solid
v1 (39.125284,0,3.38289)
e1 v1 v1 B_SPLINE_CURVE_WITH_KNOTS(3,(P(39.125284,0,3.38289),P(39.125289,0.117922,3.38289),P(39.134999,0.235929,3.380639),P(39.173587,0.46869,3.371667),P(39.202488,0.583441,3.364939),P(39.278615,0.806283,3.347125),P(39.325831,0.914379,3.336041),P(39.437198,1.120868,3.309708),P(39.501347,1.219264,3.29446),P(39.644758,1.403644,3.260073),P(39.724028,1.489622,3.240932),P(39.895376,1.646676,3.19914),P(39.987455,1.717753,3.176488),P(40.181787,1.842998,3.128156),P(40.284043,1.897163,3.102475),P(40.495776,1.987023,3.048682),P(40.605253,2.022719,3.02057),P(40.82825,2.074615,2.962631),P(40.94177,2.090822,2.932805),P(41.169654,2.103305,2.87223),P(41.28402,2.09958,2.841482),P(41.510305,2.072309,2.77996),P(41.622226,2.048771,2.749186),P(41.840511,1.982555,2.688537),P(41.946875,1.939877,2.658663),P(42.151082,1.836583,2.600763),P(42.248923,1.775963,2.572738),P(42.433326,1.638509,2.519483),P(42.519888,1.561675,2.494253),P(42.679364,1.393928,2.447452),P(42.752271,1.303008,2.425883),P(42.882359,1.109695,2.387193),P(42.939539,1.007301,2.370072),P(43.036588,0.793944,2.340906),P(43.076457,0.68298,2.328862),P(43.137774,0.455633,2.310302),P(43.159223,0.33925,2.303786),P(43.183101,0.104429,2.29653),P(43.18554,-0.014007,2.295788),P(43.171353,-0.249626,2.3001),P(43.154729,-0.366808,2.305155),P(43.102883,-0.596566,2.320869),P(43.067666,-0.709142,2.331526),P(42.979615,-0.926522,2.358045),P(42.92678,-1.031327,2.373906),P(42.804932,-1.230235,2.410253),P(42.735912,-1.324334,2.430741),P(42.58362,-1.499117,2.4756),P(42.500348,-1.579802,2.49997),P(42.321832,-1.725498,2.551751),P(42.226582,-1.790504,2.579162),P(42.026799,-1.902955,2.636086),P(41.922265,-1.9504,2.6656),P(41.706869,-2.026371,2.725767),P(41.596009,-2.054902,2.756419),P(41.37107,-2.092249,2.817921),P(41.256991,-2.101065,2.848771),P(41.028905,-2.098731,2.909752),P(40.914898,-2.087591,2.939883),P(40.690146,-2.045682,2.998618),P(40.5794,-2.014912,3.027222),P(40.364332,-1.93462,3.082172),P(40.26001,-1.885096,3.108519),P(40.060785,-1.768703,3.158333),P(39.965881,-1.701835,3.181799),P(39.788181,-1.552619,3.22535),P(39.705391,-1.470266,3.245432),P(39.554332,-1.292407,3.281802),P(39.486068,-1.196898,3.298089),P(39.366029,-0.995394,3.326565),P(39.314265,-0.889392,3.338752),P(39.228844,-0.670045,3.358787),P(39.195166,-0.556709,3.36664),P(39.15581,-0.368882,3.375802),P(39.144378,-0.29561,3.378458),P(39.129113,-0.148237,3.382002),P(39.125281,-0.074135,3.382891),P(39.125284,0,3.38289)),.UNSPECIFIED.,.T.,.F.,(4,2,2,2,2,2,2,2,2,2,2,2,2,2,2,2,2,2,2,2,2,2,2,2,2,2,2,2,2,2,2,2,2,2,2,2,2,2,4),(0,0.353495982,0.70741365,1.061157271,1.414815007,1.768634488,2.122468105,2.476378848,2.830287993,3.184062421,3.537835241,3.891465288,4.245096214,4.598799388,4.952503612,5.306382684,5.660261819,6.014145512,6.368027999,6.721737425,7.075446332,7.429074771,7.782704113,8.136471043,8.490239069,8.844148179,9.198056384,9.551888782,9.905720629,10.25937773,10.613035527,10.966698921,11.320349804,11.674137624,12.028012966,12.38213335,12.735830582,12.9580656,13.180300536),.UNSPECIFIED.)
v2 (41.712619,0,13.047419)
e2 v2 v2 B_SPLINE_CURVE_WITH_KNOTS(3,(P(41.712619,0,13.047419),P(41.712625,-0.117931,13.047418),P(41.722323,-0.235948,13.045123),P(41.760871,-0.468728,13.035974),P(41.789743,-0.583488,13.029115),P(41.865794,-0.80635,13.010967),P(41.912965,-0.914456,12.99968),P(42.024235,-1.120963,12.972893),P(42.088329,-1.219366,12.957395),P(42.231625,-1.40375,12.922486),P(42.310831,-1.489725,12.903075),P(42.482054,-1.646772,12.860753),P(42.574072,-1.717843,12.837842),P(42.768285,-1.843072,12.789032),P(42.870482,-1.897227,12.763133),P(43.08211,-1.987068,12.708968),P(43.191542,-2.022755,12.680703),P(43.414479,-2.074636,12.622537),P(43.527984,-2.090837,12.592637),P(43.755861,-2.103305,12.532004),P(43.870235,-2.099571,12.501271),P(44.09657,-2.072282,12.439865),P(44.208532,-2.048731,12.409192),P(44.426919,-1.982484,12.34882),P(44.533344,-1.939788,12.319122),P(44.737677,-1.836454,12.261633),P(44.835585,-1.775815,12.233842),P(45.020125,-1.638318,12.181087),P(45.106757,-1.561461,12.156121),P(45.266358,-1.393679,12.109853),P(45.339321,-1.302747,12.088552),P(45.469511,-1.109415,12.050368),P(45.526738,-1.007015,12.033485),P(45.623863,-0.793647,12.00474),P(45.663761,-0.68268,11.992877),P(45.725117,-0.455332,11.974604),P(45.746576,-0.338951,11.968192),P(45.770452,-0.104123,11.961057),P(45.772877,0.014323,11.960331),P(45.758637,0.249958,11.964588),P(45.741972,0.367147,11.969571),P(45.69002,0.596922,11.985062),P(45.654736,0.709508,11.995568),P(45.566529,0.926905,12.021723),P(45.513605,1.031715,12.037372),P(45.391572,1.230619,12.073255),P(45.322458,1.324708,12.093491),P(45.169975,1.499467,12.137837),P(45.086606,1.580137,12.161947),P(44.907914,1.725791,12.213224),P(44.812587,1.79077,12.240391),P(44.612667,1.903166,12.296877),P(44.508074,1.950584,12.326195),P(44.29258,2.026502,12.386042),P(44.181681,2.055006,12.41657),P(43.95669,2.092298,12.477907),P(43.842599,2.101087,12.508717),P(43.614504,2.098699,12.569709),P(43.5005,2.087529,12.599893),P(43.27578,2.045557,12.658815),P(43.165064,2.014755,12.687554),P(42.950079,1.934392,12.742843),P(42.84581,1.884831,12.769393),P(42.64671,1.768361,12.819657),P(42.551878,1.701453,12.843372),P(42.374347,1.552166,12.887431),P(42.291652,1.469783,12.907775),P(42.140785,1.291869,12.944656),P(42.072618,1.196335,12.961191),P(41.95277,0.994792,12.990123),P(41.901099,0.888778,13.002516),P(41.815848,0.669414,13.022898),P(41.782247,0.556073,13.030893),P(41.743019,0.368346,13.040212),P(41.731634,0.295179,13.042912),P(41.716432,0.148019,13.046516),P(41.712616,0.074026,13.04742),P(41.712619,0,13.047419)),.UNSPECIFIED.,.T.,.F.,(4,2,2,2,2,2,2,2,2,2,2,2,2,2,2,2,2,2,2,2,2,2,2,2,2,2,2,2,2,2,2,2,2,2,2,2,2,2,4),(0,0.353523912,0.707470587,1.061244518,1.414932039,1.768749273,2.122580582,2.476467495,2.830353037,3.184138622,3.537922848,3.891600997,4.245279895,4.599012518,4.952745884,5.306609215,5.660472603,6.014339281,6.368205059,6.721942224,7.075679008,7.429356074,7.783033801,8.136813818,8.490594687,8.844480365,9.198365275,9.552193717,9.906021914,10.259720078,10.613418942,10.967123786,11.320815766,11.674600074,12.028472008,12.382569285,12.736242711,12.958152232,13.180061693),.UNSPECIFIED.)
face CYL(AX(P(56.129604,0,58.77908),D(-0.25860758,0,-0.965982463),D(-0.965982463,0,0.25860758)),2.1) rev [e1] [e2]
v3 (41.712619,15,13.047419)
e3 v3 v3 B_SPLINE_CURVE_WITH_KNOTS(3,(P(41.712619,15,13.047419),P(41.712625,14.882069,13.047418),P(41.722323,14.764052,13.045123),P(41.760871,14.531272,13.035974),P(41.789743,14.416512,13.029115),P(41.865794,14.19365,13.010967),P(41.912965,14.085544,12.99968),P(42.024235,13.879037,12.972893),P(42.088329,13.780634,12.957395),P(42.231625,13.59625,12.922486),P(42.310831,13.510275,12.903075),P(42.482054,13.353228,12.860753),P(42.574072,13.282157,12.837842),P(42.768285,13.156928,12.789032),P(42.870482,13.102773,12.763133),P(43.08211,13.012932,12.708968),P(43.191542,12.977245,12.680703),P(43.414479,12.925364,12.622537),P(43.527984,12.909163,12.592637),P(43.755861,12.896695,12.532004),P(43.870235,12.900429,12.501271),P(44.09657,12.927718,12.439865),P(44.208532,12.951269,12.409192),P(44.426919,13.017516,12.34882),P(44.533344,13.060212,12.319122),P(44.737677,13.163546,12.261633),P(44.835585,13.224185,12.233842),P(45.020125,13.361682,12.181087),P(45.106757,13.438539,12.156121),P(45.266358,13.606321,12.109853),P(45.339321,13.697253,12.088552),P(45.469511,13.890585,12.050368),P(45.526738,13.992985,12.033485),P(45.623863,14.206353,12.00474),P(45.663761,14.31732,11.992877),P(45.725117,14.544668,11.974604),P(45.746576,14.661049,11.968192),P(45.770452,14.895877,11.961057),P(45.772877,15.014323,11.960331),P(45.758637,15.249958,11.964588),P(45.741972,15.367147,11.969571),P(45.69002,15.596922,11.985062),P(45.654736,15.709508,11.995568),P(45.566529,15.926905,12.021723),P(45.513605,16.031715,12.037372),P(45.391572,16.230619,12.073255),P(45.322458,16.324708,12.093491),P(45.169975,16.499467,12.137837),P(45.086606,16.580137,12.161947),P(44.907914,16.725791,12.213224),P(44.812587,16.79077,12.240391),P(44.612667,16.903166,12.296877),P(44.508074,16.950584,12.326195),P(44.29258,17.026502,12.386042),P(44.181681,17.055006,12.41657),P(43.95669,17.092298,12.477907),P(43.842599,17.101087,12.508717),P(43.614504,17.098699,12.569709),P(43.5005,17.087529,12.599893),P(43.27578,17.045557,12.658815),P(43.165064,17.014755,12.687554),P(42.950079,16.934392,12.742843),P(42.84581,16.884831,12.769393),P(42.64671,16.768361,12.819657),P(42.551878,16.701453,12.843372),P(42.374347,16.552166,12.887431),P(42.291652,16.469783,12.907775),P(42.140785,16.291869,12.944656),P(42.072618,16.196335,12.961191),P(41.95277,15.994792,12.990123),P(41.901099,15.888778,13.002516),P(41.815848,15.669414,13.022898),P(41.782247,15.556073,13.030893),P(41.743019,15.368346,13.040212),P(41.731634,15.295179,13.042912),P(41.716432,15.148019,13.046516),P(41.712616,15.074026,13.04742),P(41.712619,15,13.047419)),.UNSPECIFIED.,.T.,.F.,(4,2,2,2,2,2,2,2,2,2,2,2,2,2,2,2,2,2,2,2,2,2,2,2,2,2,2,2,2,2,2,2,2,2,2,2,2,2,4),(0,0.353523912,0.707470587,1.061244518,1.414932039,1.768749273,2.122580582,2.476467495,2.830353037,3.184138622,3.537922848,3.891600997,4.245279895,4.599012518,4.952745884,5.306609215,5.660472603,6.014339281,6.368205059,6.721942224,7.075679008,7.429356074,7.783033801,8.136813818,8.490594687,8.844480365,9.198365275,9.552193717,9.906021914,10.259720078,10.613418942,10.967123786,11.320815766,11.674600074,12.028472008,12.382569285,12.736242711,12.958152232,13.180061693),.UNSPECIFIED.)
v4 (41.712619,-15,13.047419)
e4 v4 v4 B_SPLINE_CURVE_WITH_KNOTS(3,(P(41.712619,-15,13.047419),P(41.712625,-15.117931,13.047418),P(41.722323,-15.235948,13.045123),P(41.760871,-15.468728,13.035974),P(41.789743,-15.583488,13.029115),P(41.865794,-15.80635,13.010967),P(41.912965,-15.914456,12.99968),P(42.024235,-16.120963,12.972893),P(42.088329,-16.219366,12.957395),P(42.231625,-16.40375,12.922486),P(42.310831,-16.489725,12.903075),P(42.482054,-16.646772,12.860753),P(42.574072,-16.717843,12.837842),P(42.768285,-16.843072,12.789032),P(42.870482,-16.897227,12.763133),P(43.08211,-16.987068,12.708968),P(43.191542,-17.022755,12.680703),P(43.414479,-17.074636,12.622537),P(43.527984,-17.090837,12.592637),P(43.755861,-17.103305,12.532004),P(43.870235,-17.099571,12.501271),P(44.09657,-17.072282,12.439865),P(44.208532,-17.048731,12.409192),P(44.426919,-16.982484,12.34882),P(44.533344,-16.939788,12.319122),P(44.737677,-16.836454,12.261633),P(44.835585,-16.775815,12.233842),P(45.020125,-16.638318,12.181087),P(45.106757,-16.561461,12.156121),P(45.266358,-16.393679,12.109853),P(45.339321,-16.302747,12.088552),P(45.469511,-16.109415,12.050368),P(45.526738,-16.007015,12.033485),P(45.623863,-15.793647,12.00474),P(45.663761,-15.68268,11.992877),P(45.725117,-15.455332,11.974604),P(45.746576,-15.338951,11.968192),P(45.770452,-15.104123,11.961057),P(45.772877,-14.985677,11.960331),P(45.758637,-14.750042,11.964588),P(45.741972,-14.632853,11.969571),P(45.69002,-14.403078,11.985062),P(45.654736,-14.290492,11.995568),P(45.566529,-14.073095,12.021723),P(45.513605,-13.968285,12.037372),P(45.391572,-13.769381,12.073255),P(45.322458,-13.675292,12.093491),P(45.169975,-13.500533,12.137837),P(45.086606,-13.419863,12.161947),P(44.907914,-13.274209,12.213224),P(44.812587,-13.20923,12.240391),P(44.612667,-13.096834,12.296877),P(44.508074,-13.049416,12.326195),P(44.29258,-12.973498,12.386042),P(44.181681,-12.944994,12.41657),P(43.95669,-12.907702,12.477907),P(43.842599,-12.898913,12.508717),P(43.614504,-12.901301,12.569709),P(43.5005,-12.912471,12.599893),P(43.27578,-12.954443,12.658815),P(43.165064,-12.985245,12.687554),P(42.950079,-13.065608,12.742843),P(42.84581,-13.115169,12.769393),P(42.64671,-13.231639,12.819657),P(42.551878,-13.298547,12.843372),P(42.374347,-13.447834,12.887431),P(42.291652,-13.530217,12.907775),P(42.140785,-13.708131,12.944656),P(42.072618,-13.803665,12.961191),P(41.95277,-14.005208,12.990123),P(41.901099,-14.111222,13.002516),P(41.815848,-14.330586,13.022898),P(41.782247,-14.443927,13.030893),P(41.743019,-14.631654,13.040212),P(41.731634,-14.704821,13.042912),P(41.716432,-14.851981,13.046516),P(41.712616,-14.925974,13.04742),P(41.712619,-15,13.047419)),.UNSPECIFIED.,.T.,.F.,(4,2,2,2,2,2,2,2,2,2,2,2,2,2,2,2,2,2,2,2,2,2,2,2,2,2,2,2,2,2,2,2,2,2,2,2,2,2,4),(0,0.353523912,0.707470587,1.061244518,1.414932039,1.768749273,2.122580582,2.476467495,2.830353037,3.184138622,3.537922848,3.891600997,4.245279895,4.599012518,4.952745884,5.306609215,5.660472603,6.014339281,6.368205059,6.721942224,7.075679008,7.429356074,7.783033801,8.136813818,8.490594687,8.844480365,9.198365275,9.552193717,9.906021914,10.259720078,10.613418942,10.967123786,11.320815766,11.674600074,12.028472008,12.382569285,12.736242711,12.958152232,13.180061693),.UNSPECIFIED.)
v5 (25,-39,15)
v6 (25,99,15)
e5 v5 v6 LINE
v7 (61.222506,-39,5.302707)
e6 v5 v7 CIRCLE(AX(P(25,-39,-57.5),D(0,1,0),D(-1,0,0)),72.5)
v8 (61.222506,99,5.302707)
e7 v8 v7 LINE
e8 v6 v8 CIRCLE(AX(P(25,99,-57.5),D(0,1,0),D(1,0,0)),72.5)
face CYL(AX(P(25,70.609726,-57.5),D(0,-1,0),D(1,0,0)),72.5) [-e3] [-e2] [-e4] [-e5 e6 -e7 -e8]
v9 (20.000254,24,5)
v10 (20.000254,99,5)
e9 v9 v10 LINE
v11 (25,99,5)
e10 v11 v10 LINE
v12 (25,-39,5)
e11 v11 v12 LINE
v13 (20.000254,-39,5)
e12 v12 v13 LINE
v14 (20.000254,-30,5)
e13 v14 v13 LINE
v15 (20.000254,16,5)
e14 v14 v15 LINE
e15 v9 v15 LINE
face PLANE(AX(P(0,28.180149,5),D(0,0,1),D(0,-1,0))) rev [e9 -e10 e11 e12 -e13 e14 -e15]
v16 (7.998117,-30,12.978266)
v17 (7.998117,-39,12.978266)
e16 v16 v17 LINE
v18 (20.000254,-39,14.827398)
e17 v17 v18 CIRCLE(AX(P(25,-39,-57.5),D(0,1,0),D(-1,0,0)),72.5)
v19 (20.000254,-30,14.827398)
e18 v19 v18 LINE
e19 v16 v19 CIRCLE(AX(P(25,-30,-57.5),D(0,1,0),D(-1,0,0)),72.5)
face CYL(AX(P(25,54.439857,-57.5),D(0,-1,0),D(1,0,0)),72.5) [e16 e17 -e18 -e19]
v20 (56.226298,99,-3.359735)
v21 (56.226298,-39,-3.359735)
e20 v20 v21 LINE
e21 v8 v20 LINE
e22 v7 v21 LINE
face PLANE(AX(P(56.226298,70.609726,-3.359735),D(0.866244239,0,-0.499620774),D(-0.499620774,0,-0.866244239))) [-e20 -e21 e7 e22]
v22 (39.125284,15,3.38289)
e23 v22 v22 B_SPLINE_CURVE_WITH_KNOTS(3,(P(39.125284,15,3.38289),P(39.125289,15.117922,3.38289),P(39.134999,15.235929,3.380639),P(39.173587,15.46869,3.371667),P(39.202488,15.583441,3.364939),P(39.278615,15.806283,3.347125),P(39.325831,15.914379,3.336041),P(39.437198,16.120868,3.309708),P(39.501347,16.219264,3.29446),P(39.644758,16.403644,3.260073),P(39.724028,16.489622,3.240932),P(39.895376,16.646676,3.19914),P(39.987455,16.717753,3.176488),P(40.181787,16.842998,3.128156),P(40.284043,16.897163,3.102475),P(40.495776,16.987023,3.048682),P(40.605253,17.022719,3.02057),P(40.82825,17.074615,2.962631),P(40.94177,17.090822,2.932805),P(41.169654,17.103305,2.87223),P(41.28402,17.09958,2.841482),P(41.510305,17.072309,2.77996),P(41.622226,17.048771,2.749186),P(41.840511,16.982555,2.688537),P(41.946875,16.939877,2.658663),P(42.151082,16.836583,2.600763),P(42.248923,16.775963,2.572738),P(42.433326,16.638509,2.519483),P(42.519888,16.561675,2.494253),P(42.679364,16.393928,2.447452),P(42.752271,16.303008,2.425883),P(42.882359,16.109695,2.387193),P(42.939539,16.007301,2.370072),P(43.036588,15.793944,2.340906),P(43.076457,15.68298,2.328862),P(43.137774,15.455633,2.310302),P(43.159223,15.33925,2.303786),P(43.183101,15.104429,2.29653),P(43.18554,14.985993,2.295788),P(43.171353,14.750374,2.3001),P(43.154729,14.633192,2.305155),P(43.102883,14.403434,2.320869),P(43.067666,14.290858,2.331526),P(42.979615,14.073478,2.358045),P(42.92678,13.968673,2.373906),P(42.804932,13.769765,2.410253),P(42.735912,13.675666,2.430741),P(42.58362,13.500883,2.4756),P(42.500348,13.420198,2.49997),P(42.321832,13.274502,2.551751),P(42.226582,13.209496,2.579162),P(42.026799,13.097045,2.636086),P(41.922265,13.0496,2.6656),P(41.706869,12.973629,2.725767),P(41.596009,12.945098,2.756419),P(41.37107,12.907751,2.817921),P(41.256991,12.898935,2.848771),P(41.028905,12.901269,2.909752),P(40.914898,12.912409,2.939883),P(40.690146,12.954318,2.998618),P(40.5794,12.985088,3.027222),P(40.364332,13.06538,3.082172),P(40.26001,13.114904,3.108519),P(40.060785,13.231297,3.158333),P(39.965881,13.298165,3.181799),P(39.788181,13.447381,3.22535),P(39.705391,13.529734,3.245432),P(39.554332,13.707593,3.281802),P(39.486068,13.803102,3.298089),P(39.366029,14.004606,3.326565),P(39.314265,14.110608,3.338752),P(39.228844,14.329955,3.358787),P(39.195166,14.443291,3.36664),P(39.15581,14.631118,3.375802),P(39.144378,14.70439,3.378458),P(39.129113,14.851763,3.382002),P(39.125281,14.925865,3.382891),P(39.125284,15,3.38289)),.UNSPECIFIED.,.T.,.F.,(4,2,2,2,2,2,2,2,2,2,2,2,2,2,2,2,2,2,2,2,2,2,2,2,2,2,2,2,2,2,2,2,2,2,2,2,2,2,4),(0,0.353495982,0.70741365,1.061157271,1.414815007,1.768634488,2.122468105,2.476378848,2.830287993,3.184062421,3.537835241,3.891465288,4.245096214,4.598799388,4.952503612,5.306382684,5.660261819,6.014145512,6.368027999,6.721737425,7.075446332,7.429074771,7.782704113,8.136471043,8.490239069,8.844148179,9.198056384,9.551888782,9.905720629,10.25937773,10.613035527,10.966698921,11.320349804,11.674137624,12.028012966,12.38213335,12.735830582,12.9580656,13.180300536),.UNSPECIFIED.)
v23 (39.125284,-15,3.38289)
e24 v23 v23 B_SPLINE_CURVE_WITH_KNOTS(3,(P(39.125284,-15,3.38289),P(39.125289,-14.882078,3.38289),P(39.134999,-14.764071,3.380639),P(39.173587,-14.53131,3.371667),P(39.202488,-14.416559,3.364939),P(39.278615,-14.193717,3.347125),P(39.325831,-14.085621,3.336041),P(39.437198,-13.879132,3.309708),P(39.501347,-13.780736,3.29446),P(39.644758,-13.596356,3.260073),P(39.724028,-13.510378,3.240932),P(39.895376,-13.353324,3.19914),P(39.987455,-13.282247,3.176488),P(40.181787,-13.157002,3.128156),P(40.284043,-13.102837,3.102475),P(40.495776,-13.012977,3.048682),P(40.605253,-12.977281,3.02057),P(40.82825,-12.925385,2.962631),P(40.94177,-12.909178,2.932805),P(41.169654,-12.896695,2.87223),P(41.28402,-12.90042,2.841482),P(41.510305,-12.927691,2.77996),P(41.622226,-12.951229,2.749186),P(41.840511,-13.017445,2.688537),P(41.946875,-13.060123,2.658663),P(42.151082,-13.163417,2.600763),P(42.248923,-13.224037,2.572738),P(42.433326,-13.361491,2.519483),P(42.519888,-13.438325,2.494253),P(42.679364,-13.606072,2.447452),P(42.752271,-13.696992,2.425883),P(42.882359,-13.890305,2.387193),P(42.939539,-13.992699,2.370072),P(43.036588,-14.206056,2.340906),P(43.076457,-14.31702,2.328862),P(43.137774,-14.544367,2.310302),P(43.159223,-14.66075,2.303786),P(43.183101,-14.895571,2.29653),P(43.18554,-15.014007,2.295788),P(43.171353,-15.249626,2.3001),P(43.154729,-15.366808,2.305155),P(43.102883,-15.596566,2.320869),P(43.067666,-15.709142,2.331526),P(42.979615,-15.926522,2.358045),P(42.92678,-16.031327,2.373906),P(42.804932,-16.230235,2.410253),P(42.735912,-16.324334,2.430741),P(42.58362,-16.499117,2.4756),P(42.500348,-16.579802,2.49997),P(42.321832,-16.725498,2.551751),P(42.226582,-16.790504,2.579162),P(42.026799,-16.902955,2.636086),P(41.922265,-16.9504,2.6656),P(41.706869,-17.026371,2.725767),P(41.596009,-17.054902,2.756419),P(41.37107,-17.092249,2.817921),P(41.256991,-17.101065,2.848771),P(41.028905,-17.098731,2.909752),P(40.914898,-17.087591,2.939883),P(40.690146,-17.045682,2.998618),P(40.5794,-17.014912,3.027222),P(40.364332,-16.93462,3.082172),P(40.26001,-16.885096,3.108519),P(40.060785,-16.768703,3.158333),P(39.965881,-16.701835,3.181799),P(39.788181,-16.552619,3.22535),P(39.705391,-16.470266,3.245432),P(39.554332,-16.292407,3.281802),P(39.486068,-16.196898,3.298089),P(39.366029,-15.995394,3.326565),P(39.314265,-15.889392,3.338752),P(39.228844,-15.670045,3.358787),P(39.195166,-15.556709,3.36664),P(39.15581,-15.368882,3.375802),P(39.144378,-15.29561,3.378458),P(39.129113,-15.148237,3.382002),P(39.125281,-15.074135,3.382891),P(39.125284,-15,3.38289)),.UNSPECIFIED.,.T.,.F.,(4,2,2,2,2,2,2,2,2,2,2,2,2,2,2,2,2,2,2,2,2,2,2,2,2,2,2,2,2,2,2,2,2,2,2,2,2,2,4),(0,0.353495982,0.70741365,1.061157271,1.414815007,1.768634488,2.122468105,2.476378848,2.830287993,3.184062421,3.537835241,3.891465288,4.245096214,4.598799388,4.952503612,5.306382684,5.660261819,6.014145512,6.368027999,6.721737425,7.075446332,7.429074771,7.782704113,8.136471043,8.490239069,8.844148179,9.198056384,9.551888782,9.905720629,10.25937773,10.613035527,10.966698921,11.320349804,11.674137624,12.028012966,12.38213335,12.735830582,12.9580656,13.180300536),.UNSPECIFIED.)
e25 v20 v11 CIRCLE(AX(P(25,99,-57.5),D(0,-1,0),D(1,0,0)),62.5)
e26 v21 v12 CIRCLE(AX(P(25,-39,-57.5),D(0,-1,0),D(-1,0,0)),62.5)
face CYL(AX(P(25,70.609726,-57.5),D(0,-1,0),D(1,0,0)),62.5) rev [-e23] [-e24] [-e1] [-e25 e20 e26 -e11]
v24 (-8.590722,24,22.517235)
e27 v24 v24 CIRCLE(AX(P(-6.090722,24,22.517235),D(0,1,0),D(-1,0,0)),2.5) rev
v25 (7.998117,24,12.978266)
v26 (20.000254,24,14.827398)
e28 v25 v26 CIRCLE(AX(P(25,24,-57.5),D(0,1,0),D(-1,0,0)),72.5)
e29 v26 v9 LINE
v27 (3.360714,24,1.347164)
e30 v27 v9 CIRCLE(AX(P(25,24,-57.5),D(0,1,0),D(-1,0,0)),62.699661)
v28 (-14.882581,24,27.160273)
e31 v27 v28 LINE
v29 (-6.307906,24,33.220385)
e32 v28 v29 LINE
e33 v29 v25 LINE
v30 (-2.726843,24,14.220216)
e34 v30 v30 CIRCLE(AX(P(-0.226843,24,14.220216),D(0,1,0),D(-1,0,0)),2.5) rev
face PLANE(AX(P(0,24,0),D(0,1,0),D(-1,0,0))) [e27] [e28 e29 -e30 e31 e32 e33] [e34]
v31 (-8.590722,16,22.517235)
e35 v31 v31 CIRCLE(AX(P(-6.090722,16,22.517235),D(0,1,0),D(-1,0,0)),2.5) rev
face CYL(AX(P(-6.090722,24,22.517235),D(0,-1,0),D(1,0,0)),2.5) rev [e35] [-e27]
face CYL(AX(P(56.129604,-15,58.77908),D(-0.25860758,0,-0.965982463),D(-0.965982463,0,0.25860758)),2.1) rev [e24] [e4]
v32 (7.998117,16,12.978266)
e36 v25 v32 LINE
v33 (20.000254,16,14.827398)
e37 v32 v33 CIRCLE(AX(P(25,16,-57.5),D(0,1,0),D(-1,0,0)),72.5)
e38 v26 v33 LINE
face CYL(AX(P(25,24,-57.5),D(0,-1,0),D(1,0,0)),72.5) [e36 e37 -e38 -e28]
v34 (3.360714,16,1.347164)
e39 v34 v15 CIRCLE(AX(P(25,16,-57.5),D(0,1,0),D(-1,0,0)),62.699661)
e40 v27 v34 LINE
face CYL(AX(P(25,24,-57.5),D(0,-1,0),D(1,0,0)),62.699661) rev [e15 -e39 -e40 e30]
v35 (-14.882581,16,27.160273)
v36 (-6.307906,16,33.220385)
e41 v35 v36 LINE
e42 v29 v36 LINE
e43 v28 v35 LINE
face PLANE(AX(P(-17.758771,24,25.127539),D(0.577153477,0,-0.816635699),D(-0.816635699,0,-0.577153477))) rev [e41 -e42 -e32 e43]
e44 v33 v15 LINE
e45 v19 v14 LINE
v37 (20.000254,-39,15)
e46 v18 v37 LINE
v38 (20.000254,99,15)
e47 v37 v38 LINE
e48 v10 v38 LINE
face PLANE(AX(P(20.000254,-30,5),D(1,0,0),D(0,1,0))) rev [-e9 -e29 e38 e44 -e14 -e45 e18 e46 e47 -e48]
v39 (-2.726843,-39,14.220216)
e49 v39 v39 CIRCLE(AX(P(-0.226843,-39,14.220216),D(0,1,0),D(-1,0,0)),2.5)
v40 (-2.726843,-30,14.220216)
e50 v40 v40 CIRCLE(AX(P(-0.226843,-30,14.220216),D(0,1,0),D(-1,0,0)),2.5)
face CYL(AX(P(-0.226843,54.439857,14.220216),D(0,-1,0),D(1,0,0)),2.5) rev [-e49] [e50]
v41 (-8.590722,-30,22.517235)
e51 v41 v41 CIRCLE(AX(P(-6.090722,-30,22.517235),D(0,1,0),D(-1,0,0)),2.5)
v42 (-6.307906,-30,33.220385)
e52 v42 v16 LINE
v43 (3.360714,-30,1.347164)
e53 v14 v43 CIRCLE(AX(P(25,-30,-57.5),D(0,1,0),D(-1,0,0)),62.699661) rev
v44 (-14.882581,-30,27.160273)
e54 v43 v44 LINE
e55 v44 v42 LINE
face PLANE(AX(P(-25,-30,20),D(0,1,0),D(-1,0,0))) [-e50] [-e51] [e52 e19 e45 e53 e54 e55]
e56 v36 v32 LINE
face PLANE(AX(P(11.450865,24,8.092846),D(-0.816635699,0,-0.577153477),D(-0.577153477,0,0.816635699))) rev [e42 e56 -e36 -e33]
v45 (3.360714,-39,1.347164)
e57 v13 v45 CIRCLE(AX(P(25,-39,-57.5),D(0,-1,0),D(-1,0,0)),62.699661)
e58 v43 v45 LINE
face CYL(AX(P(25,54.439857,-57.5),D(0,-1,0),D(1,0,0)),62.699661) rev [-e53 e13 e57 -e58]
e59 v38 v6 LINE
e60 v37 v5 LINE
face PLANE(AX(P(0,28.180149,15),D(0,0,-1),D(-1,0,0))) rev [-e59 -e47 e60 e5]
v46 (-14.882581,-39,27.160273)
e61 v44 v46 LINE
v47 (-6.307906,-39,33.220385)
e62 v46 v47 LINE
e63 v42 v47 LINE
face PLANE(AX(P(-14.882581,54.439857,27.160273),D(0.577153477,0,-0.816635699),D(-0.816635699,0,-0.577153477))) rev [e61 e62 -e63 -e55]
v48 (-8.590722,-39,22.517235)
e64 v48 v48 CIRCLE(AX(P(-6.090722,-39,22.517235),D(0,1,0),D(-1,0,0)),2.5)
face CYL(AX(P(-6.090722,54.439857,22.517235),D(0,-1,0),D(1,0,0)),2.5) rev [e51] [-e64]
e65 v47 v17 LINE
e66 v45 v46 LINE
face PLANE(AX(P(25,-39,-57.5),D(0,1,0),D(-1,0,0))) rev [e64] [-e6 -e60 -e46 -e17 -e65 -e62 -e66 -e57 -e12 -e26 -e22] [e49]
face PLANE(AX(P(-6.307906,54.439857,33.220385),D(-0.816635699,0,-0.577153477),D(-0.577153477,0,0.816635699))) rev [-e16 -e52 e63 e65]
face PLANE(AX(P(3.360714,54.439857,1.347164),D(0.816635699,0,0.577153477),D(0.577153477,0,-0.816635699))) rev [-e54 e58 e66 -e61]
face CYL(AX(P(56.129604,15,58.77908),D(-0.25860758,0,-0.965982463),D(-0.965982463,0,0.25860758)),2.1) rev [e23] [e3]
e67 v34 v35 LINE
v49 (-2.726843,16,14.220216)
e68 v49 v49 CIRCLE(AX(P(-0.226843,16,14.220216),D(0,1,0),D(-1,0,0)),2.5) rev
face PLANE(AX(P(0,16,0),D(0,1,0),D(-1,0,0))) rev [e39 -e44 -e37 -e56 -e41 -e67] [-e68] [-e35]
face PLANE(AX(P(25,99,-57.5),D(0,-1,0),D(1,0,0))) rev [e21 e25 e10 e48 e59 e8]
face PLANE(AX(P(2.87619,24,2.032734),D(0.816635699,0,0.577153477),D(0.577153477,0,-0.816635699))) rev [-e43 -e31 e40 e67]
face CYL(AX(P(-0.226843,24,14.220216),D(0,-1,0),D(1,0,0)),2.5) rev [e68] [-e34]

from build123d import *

# Parameters (mm, degrees)
BOSS_EXTRUDE2_DEPTH = 20
FILLET1_RADIUS      = 10
FILLET1_LENGTH      = 5
FILLET2_RADIUS      = 10
FILLET2_LENGTH      = 5
SKETCH5_R           = 1
SKETCH5_R_2         = 5.5
CUT_EXTRUDE5_DEPTH  = 69.007352544
CUT_EXTRUDE7_DEPTH  = 25
FILLET5_R           = 10
BOSS_EXTRUDE5_DEPTH = 60
SKETCH13_R          = 2.1
CUT_EXTRUDE8_DEPTH  = 60
CUT_EXTRUDE9_DEPTH  = 60
CUT_EXTRUDE10_DEPTH = 60
SKETCH17_R          = 2.5
BOSS_EXTRUDE6_DEPTH = 8
SKETCH18_R          = 2.5
BOSS_EXTRUDE7_DEPTH = 9
BOSS_EXTRUDE8_DEPTH = 69


with BuildPart() as part:
    # Sketch1 → Boss-Extrude2 (new body)
    with BuildSketch(Plane.XY):
        Polygon((-25, 30), (25, 30), (25, -30), (-25, -30), (-25, -25), (-20, -25), (20, -25), (20, 25), (-20, 25), (-25, 25), align=None)
    extrude(amount=BOSS_EXTRUDE2_DEPTH)

    # Fillet1: full round fillet: the end face becomes a half cylinder, R = half its width
    fillet1_face = Plane((-25, 27.5, 10), x_dir=(0, -1, 0), z_dir=(-1, 0, 0))  # on the end face: x along it, z out of the body
    fillet1_slab = fillet1_face.offset(-FILLET1_RADIUS / 2) * Box(FILLET1_LENGTH, 2 * FILLET1_RADIUS, FILLET1_RADIUS, mode=Mode.PRIVATE)  # the body's end, R deep
    fillet1_round = Plane((-15, 27.5, 10), x_dir=(-1, 0, 0), z_dir=(0, -1, 0)) * Cylinder(FILLET1_RADIUS, FILLET1_LENGTH, mode=Mode.PRIVATE)  # its axis R under the face
    add(fillet1_slab - fillet1_round, mode=Mode.SUBTRACT)

    # Fillet2: full round fillet: the end face becomes a half cylinder, R = half its width
    fillet2_face = Plane((-25, -27.5, 10), x_dir=(0, -1, 0), z_dir=(-1, 0, 0))  # on the end face: x along it, z out of the body
    fillet2_slab = fillet2_face.offset(-FILLET2_RADIUS / 2) * Box(FILLET2_LENGTH, 2 * FILLET2_RADIUS, FILLET2_RADIUS, mode=Mode.PRIVATE)  # the body's end, R deep
    fillet2_round = Plane((-15, -27.5, 10), x_dir=(-1, 0, 0), z_dir=(0, -1, 0)) * Cylinder(FILLET2_RADIUS, FILLET2_LENGTH, mode=Mode.PRIVATE)  # its axis R under the face
    add(fillet2_slab - fillet2_round, mode=Mode.SUBTRACT)

    # Sketch5 → Cut-Extrude5 (cut, through all)
    with BuildSketch(Plane(origin=(0, 30, 0), x_dir=(1, 0, 0), z_dir=(0, 1, 0))):
        with Locations(Location((-15, -3, 0), (0, 0, 180))):
            Circle(SKETCH5_R)
        with Locations(Location((-22, -10, 0), (0, 0, 180))):
            Circle(SKETCH5_R)
        with Locations(Location((-15, -17, 0), (0, 0, 180))):
            Circle(SKETCH5_R)
        with Locations(Location((-8, -10, 0), (0, 0, 180))):
            Circle(SKETCH5_R)
        with Locations(Location((-15, -10, 0), (0, 0, 180))):
            Circle(SKETCH5_R_2)
    extrude(amount=-CUT_EXTRUDE5_DEPTH, mode=Mode.SUBTRACT)

    # Sketch10 → Cut-Extrude7 (cut)
    with BuildSketch(Plane(origin=(25, 0, 0), x_dir=(0, 0, -1), z_dir=(1, 0, 0))):
        Polygon((-15, 28.180148829), (-15, -28.180148829), (-15, -30), (-20, -30), (-20, 30), (-15, 30), align=None)
        Polygon((-5, 28.180148829), (-5, -28.180148829), (-5, -30), (0, -30), (0, 30), (-5, 30), align=None)
    extrude(amount=-CUT_EXTRUDE7_DEPTH, mode=Mode.SUBTRACT)

    # Fillet5
    # the kernel refuses this fillet: 10 mm, written as the material it adds along each edge
    with BuildSketch(Plane(origin=(0, 25, 15), x_dir=(1, 0, 0), z_dir=(0, 1, 0)), Plane(origin=(0, -30, 15), x_dir=(1, 0, 0), z_dir=(0, 1, 0)), Plane(origin=(0, -25, 5), x_dir=(1, 0, 0), z_dir=(0, -1, 0))) as fillet5_piece_1:
        with BuildLine():
            CenterArc((8.660254038, -10), FILLET5_R, 90, 60)
            Line((0, -5), (-0.173205081, -4.9))
            ThreePointArc((-0.173205081, -4.9), (-0.2, -2.5), (-0.2, 0))
            Line((-0.2, 0), (0, 0.2))
            Line((0, 0.2), (8.660254038, 0.2))
            Line((8.660254038, 0.2), (8.660254038, 0))
        make_face()
    extrude(amount=5)
    with BuildSketch(Plane(origin=(0, 30, 5), x_dir=(0, 0, -1), z_dir=(0, -1, 0))) as fillet5_piece_2:
        with BuildLine():
            CenterArc((10, 8.660254038), FILLET5_R, 180, 60)
            Line((0, 8.660254038), (-0.2, 8.660254038))
            Line((-0.2, 8.660254038), (-0.2, 0))
            Line((-0.2, 0), (0, -0.2))
            ThreePointArc((0, -0.2), (2.5, -0.2), (4.9, -0.173205081))
            Line((4.9, -0.173205081), (5, 0))
        make_face()
    extrude(amount=5)

    # Sketch12 → Boss-Extrude5 (add)
    with BuildSketch(Plane.XZ.offset(30)):
        with BuildLine():
            Line((56.226298398, -3.359735054), (61.222506141, 5.302707337))
            ThreePointArc((61.222506141, 5.302707337), (43.74904955, 12.533728595), (25, 15))
            Line((25, 15), (25, 5))
            ThreePointArc((25, 5), (41.16297375, 2.873903962), (56.226298398, -3.359735054))
        make_face()
    extrude(amount=-BOSS_EXTRUDE5_DEPTH)

    # Sketch13 → Cut-Extrude8 (cut)
    with BuildSketch(Plane(origin=(2.920998947, 0, 10.910870277), x_dir=(-0.9659824633840055, 0, 0.2586075800021504), z_dir=(-0.2586075800021504, 0, -0.9659824633840055))):
        with Locations((-39.019497435, 15)):
            Circle(SKETCH13_R)
        with Locations((-39.019497435, 0)):
            Circle(SKETCH13_R)
        with Locations((-39.019497435, -15)):
            Circle(SKETCH13_R)
    extrude(amount=-CUT_EXTRUDE8_DEPTH, mode=Mode.SUBTRACT)

    # Sketch15 → Cut-Extrude9 (cut)
    with BuildSketch(Plane(origin=(0, 30, 0), x_dir=(1, 0, 0), z_dir=(0, 1, 0))):
        with BuildLine():
            Line((8.660254038, -5), (8.660254038, -15))
            ThreePointArc((8.660254038, -15), (-39.182795974, -10), (8.660254038, -5))
        make_face()
    extrude(amount=-CUT_EXTRUDE9_DEPTH, mode=Mode.SUBTRACT)

    # Sketch16 → Cut-Extrude10 (cut)
    with BuildSketch(Plane(origin=(0, 30, 0), x_dir=(1, 0, 0), z_dir=(0, 1, 0))):
        Polygon((-6.307906019, -33.220384693), (8.660254038, -15), (20.000254038, -15), (20.000254038, -5), (8.660254038, -5), (3.496355525, -1.350438774), (-14.790578774, -27.225295226), align=None)
    extrude(amount=-CUT_EXTRUDE10_DEPTH, mode=Mode.SUBTRACT)

    # Sketch17 → Boss-Extrude6 (add)
    # profile 1 of 2: a face of its own
    with BuildSketch(Plane(origin=(0, 16, 0), x_dir=(1, 0, 0), z_dir=(0, 1, 0))):
        Polygon((2.432023453, -2.661202229), (-1.062108246, -7.605177784), (-12.605177784, -23.937891754), (-14.882580853, -27.160273185), (-8.757813114, -31.488924262), (-6.307906019, -33.220384693), (7.998117102, -12.978265997), (11.006698288, -8.721313737), align=None)
        with Locations(Location((-6.090722034, -22.517234763, 0), (0, 0, 180))):
            Circle(SKETCH17_R, mode=Mode.SUBTRACT)
        with Locations(Location((-0.226842709, -14.220216066, 0), (0, 0, 180))):
            Circle(SKETCH17_R, mode=Mode.SUBTRACT)
    # profile 2 of 2: a face of its own
    with BuildSketch(Plane(origin=(0, 16, 0), x_dir=(1, 0, 0), z_dir=(0, 1, 0))):
        with BuildLine():
            Line((3.360713643, -1.347164296), (2.432023453, -2.661202229))
            Line((2.432023453, -2.661202229), (11.006698288, -8.721313737))
            Line((11.006698288, -8.721313737), (7.998117102, -12.978265997))
            ThreePointArc((7.998117102, -12.978265997), (13.960401245, -14.154569005), (20.000254038, -14.827398269))
            Line((20.000254038, -14.827398269), (20.000254038, -5))
            ThreePointArc((20.000254038, -5), (11.555844657, -3.741343444), (3.360713643, -1.347164296))
        make_face()
    extrude(amount=BOSS_EXTRUDE6_DEPTH)

    # Sketch18 → Boss-Extrude7 (add)
    with BuildSketch(Plane(origin=(0, -39, 0), x_dir=(1, 0, 0), z_dir=(0, 1, 0))):
        with BuildLine():
            Line((3.360713643, -1.347164296), (-14.882580853, -27.160273185))
            Line((-14.882580853, -27.160273185), (-6.307906019, -33.220384693))
            Line((-6.307906019, -33.220384693), (7.998117102, -12.978265997))
            ThreePointArc((7.998117102, -12.978265997), (13.960401245, -14.154569005), (20.000254038, -14.827398269))
            Line((20.000254038, -14.827398269), (20.000254038, -15))
            Line((20.000254038, -15), (25, -15))
            ThreePointArc((25, -15), (43.74904955, -12.533728595), (61.222506141, -5.302707337))
            Line((61.222506141, -5.302707337), (56.226298398, 3.359735054))
            ThreePointArc((56.226298398, 3.359735054), (41.16297375, -2.873903962), (25, -5))
            Line((25, -5), (20.000254038, -5))
            ThreePointArc((20.000254038, -5), (11.555844657, -3.741343444), (3.360713643, -1.347164296))
        make_face()
        with Locations(Location((-6.090722034, -22.517234763, 0), (0, 0, 180))):
            Circle(SKETCH18_R, mode=Mode.SUBTRACT)
        with Locations(Location((-0.226842709, -14.220216066, 0), (0, 0, 180))):
            Circle(SKETCH18_R, mode=Mode.SUBTRACT)
    extrude(amount=BOSS_EXTRUDE7_DEPTH)

    # Sketch19 → Boss-Extrude8 (add)
    with BuildSketch(Plane(origin=(0, 30, 0), x_dir=(1, 0, 0), z_dir=(0, 1, 0))):
        with BuildLine():
            Line((56.226298398, 3.359735054), (61.222506141, -5.302707337))
            ThreePointArc((61.222506141, -5.302707337), (43.74904955, -12.533728595), (25, -15))
            Line((25, -15), (20.000254038, -15))
            Line((20.000254038, -15), (20.000254038, -5))
            Line((20.000254038, -5), (25, -5))
            ThreePointArc((25, -5), (41.16297375, -2.873903962), (56.226298398, 3.359735054))
        make_face()
    extrude(amount=BOSS_EXTRUDE8_DEPTH)


solid = part.part
